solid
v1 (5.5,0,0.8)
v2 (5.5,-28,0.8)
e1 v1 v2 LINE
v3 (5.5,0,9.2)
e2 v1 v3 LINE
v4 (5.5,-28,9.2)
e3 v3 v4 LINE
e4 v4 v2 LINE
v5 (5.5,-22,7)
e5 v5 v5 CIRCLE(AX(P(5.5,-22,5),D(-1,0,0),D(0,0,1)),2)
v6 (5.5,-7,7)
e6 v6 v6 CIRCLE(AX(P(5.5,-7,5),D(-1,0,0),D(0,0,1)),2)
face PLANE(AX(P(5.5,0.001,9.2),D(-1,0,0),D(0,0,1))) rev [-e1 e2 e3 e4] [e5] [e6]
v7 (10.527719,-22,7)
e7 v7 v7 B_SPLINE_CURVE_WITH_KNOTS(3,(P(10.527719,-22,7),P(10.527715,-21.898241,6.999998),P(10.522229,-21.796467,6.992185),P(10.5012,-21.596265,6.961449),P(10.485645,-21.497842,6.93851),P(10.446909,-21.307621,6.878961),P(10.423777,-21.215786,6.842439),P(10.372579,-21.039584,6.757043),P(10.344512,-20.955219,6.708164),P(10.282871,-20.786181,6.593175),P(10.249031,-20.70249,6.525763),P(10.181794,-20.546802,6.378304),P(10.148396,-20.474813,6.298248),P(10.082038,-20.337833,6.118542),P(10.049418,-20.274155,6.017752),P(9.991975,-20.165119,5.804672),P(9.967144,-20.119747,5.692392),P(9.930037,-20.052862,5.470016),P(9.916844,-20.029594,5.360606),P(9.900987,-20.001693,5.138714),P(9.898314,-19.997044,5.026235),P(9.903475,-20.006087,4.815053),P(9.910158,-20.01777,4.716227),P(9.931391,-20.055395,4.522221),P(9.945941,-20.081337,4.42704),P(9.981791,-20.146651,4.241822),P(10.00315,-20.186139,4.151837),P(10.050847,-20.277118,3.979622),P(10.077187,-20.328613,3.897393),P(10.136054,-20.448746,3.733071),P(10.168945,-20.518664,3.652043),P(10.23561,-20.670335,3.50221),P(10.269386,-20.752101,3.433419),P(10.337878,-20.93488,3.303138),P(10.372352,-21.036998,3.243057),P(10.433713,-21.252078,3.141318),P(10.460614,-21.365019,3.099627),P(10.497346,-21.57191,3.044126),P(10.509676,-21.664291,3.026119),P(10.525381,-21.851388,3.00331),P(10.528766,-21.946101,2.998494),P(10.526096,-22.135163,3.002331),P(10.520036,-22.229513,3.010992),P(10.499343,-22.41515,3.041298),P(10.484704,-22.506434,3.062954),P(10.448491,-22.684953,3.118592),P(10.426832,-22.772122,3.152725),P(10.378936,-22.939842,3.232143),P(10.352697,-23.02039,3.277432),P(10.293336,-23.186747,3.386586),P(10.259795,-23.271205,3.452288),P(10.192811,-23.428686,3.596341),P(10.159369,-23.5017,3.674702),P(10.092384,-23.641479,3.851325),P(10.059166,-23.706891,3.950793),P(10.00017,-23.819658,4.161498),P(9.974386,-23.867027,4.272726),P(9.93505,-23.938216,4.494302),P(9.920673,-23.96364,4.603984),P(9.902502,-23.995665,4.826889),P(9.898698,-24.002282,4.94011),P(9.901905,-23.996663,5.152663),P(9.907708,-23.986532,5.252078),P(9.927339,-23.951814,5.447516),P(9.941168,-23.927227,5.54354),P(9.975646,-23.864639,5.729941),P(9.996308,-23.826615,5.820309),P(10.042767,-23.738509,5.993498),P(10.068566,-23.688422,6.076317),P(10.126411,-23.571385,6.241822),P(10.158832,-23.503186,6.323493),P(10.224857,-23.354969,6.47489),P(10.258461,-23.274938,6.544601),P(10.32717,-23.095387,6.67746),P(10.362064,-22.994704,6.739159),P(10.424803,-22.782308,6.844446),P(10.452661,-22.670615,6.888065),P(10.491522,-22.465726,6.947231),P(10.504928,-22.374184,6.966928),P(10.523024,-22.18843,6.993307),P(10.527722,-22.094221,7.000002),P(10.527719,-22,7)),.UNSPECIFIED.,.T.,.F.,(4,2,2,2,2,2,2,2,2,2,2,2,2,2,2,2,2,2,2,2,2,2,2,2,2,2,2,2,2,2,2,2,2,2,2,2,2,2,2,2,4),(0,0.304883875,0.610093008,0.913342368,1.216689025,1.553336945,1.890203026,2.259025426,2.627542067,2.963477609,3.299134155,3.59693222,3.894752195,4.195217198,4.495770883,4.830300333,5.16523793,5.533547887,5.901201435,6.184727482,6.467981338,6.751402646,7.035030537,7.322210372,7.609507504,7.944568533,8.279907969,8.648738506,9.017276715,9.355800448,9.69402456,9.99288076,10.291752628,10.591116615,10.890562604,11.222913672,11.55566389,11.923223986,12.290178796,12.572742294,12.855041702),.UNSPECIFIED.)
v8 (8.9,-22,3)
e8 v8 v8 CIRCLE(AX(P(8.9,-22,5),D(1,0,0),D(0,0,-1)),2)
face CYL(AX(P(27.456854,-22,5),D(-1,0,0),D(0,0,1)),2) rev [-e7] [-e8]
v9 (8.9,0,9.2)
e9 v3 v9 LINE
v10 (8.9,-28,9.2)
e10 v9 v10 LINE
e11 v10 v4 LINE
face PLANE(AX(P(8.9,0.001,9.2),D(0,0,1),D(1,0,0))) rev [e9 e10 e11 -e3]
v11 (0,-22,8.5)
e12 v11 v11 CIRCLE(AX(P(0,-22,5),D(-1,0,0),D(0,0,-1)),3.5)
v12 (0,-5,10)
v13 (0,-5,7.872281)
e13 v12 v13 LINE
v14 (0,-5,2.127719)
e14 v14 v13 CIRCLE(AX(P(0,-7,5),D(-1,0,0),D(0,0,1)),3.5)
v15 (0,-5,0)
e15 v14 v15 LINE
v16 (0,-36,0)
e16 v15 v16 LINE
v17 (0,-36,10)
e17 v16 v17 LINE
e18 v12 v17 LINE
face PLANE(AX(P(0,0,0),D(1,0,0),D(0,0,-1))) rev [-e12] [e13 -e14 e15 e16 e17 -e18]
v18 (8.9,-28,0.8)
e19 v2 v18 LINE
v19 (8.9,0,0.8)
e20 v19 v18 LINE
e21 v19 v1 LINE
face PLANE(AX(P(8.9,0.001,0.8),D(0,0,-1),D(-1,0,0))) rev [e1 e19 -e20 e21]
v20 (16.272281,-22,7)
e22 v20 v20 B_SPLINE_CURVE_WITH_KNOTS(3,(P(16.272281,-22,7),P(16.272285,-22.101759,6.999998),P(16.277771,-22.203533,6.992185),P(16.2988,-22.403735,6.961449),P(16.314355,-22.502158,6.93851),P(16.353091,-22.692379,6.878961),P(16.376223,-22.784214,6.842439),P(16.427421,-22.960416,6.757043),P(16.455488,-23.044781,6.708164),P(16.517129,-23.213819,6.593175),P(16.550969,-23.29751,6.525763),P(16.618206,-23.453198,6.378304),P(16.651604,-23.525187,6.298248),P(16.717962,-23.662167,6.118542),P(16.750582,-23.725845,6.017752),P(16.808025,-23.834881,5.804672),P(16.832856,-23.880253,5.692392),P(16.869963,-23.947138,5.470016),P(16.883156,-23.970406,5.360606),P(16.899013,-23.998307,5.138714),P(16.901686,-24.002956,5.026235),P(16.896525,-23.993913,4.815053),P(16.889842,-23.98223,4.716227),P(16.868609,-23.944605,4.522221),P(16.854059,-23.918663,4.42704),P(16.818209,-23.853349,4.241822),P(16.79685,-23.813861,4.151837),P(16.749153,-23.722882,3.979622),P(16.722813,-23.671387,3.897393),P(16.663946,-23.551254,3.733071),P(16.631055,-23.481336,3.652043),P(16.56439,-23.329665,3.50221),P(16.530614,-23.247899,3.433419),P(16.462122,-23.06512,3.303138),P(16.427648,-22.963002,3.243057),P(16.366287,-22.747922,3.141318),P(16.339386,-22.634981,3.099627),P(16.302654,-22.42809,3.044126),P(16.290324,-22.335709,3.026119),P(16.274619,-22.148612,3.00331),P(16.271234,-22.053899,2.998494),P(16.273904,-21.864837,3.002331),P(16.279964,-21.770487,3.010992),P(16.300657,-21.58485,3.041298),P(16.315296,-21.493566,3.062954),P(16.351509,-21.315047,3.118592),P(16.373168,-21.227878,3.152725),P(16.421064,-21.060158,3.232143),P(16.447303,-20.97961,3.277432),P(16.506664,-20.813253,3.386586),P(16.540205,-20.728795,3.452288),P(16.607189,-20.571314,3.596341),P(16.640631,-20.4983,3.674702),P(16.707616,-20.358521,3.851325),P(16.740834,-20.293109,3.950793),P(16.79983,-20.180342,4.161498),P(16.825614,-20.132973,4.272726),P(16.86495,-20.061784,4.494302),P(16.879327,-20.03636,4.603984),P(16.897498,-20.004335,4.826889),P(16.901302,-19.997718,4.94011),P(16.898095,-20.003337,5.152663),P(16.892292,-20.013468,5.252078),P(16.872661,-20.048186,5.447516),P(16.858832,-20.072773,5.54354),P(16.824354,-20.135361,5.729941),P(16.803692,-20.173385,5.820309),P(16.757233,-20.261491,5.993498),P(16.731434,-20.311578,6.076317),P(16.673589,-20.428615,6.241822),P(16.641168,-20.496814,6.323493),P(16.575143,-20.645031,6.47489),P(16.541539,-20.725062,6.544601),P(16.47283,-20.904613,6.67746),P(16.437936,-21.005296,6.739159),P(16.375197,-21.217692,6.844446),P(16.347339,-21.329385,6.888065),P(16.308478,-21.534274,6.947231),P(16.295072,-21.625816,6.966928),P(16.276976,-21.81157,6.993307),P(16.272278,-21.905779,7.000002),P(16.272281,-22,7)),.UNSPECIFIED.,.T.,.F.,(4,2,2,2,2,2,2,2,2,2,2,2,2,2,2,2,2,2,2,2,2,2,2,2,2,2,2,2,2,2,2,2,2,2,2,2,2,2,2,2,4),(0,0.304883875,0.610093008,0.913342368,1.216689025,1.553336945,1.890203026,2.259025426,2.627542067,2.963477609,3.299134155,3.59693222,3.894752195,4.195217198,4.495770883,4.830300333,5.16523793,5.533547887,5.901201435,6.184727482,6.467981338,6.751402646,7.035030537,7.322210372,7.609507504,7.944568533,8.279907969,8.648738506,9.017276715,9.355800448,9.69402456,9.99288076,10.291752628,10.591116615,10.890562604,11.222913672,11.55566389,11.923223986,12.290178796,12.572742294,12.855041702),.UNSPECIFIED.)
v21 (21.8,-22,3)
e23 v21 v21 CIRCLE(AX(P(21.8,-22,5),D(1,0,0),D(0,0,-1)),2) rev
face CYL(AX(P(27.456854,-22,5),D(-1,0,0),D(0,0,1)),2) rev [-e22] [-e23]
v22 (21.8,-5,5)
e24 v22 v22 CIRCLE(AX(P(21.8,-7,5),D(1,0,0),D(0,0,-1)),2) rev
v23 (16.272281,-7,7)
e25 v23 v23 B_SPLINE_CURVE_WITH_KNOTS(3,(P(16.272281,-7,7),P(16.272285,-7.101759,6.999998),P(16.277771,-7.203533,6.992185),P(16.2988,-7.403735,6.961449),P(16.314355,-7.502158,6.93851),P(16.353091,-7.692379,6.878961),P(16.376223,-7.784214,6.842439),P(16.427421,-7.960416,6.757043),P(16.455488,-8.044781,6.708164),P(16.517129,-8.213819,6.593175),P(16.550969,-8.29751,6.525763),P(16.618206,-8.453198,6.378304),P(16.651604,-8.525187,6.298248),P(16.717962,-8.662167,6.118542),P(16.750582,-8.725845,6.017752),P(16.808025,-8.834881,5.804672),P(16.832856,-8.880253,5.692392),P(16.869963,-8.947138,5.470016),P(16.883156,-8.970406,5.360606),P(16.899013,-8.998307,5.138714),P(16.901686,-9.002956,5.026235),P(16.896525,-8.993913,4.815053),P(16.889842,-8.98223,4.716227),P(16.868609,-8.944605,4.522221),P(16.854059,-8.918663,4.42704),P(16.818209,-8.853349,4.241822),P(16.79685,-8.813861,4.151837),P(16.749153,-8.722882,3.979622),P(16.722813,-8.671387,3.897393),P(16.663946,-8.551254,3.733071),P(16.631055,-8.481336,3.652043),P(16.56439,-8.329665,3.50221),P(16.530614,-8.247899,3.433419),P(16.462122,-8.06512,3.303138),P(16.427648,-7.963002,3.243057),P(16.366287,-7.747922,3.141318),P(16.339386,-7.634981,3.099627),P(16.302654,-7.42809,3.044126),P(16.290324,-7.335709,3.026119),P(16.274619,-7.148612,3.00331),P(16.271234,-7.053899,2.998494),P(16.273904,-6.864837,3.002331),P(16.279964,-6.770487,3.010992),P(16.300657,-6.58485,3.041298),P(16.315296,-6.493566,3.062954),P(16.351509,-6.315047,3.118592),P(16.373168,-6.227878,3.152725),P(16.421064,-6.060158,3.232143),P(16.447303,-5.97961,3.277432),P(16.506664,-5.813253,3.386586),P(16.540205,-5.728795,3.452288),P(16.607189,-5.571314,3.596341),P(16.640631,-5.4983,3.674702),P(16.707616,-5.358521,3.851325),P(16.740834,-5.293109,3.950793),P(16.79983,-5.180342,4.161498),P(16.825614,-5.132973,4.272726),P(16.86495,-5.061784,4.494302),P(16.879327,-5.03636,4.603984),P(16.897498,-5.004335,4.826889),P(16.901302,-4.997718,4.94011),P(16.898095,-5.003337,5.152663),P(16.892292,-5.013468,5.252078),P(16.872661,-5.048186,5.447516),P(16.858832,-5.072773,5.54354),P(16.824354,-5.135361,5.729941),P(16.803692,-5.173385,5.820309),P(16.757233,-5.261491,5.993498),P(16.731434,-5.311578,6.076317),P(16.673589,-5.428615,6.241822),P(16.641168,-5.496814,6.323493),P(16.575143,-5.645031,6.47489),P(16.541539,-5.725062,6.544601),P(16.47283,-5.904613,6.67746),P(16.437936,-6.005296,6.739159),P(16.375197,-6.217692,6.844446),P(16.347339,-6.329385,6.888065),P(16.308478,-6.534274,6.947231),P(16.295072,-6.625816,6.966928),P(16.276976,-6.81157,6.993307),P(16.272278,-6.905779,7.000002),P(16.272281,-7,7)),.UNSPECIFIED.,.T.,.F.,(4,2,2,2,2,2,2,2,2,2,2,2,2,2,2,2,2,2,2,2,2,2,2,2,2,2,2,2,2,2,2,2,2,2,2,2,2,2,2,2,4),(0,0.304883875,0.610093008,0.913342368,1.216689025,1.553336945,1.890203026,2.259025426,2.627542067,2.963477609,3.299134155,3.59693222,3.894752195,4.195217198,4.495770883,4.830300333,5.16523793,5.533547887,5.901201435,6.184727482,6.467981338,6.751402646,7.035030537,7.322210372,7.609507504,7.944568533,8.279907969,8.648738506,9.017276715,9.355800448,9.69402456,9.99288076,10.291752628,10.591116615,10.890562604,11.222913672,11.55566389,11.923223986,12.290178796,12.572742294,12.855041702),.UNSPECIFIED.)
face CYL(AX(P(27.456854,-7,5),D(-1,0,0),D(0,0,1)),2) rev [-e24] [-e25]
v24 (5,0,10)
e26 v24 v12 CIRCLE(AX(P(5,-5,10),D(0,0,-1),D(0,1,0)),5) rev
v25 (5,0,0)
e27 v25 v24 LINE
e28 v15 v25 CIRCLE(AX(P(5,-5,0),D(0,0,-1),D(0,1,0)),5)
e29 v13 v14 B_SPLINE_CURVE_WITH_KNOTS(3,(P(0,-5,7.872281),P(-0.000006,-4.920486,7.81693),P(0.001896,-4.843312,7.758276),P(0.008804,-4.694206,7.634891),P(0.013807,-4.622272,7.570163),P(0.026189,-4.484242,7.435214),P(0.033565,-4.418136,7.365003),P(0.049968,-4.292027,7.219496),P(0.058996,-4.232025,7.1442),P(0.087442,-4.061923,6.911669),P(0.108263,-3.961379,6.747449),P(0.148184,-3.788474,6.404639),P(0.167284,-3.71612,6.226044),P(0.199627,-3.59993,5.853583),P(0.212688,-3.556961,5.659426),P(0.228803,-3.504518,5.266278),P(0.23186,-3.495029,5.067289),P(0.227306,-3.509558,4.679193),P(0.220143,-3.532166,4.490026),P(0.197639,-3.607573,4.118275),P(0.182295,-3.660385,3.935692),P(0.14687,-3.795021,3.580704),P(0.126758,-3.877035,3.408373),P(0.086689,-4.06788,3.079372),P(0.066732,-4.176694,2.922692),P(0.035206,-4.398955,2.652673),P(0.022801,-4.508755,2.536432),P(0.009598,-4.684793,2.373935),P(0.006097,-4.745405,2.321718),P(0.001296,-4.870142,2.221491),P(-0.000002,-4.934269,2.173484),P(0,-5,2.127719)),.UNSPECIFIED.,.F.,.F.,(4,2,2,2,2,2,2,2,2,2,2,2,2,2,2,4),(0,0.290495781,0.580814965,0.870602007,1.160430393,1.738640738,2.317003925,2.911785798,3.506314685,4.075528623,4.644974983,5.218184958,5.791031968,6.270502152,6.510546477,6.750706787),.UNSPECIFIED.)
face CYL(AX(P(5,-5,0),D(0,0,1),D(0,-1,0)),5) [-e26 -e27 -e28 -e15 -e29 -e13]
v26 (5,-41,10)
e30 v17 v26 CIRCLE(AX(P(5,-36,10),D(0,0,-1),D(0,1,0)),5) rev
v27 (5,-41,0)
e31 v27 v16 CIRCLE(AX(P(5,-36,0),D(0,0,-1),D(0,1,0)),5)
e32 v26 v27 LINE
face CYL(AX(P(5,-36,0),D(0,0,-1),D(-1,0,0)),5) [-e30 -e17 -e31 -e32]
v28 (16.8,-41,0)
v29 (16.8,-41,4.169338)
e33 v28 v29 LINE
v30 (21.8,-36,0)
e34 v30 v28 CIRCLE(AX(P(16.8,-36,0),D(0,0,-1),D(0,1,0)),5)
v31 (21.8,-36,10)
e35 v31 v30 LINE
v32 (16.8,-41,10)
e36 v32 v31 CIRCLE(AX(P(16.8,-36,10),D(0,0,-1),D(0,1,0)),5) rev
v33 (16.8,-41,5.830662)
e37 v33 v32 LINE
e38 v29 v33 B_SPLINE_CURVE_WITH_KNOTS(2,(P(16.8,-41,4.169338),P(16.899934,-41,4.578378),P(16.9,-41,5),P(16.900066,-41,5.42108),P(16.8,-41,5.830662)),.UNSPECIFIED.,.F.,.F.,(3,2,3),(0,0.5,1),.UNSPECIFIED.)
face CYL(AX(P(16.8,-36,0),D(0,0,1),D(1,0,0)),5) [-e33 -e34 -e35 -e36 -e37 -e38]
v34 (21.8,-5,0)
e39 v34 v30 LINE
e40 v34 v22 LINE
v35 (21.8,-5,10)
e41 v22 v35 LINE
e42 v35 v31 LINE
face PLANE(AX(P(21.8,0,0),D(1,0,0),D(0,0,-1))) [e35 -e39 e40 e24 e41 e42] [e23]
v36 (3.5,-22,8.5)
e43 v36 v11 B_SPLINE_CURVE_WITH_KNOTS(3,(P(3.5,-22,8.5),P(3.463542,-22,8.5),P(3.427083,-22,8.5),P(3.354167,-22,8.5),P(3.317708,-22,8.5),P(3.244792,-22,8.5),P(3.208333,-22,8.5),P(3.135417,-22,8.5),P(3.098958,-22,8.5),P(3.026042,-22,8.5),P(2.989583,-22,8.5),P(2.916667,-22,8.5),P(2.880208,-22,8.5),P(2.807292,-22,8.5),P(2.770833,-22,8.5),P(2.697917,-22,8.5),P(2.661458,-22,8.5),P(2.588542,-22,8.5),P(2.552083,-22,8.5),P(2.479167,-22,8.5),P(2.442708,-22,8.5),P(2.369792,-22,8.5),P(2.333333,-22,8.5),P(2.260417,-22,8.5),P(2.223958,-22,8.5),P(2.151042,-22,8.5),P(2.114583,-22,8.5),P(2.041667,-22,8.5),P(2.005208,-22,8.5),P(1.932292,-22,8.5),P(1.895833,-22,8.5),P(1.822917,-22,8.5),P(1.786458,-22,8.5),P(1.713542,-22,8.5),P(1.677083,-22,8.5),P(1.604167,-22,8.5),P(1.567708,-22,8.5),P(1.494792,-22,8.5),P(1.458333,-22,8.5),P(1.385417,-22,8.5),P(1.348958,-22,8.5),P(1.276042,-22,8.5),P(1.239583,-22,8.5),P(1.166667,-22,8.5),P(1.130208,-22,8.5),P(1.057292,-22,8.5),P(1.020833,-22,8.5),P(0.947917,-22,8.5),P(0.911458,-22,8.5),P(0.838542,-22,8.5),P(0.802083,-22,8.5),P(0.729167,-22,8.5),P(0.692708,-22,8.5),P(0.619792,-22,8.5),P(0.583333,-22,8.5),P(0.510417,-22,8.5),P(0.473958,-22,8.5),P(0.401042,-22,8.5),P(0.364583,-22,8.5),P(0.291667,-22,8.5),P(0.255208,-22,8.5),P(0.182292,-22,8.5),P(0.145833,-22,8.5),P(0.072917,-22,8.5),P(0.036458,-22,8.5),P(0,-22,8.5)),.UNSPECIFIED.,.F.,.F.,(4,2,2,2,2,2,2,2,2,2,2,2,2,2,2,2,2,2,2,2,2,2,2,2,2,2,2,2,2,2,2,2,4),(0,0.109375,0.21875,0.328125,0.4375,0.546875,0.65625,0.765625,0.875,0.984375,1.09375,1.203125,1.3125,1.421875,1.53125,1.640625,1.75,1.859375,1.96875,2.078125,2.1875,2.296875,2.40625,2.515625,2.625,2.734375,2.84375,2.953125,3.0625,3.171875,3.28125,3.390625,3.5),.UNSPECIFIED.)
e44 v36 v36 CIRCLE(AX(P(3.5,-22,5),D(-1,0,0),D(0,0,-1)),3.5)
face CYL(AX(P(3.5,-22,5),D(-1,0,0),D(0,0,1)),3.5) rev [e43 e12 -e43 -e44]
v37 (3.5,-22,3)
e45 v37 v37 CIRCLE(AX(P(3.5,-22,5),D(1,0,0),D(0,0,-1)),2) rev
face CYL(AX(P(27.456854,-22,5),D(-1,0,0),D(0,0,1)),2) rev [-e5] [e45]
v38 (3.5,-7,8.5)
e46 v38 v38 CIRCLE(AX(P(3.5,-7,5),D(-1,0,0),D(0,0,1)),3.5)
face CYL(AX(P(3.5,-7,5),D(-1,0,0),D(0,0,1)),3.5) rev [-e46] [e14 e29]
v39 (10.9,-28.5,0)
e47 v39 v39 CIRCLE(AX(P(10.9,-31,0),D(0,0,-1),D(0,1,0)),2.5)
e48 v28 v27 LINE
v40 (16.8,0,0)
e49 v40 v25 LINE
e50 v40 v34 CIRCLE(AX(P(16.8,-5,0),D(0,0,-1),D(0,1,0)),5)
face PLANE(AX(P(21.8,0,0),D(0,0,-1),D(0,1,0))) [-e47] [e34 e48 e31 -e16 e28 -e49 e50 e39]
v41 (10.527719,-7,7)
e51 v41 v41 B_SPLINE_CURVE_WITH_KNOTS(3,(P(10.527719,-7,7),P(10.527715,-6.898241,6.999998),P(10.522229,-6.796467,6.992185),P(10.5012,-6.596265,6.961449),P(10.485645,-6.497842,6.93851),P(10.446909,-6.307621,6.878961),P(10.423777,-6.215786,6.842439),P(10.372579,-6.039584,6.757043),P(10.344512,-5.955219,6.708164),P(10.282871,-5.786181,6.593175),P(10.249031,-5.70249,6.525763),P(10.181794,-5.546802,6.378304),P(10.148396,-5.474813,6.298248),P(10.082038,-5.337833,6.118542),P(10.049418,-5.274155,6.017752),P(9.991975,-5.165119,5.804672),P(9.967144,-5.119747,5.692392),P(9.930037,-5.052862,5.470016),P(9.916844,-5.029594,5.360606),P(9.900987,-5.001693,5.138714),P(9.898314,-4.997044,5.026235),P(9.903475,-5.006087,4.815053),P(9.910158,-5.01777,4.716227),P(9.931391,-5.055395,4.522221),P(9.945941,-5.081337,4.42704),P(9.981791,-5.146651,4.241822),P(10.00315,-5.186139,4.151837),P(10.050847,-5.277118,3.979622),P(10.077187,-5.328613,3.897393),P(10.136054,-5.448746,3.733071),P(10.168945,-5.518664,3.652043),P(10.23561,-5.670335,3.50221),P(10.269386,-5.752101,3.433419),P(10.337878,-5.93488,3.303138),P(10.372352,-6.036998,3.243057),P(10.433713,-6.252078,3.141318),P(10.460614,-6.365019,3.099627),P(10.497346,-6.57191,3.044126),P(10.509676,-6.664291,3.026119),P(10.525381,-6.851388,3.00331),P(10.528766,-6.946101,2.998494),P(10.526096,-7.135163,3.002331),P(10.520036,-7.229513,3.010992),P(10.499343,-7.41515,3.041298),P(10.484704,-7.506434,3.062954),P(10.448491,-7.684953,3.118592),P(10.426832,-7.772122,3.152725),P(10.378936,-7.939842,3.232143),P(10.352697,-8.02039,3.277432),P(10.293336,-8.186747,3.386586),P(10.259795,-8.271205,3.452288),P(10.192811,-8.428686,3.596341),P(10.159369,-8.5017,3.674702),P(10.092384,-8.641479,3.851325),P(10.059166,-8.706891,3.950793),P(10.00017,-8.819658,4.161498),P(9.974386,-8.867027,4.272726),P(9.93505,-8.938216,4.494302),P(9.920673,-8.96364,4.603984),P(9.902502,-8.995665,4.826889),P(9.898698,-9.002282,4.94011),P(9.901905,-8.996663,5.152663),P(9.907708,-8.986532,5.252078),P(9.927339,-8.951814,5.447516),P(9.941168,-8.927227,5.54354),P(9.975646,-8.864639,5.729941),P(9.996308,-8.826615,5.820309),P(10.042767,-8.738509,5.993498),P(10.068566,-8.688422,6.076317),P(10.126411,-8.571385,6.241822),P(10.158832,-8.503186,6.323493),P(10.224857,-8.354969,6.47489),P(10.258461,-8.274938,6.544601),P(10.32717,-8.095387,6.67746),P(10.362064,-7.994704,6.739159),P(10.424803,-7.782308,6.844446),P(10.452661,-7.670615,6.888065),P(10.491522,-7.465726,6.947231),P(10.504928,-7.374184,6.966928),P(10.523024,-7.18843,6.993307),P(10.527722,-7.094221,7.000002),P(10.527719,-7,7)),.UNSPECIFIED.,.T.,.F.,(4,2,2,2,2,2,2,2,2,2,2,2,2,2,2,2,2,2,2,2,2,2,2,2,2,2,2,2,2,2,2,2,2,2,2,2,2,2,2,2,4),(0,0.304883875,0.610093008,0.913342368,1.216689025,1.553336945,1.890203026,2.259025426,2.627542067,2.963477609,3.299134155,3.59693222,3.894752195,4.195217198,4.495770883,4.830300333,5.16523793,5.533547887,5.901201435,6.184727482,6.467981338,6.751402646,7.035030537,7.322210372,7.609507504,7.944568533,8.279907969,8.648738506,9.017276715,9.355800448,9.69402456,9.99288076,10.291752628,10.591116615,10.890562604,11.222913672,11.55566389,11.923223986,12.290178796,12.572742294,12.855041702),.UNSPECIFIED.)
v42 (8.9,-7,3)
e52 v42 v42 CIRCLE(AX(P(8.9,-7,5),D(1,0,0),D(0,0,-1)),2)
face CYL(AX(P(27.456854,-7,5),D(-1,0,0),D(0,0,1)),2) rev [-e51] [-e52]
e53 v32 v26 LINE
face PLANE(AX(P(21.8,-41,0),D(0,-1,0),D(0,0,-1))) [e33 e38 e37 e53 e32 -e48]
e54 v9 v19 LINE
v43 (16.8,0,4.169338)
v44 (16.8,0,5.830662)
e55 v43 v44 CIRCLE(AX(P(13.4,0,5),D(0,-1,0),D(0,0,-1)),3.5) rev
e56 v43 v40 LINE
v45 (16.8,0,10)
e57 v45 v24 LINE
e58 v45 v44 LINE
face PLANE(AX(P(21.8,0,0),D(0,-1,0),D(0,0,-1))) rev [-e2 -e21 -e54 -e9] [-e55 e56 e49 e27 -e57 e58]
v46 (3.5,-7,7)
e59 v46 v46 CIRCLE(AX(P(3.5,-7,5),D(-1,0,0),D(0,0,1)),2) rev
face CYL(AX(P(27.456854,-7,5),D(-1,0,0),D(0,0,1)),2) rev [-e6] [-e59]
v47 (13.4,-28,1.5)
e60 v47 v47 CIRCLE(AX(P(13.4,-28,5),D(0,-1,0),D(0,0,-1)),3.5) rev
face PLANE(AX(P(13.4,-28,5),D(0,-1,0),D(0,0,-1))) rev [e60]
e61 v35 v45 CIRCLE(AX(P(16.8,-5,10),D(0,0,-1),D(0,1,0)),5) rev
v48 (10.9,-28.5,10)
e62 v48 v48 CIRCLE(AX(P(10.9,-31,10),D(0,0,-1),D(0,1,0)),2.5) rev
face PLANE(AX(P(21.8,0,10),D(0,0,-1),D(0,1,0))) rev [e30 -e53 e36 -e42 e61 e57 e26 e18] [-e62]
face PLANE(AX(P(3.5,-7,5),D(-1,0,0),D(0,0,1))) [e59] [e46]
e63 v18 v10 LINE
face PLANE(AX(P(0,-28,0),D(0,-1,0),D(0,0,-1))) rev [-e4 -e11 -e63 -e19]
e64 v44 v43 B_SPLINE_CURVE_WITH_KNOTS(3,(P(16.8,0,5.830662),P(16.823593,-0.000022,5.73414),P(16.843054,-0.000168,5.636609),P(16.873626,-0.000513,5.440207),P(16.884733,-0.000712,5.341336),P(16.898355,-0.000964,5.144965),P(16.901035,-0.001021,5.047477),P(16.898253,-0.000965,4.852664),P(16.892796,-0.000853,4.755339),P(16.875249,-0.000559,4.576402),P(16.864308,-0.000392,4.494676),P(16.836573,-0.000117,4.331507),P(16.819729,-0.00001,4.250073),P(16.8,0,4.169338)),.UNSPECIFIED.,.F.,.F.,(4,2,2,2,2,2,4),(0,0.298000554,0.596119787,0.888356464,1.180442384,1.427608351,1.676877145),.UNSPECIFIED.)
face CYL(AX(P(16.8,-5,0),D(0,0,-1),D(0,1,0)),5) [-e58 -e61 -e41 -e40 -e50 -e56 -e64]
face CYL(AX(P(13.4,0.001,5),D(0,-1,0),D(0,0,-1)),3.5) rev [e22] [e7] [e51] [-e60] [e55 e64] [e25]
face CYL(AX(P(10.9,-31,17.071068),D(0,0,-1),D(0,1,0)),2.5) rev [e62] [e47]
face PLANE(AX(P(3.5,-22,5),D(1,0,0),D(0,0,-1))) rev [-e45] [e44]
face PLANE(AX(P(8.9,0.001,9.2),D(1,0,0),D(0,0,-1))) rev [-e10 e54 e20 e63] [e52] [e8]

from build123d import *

# Parameters (mm, degrees)
CROQUIS1_W              = 10
CROQUIS1_H              = 41
SALIENTE_EXTRUIR1_DEPTH = 21.8
CROQUIS6_R              = 2
CORTAR_EXTRUIR2_DEPTH   = 21.8
CORTAR_EXTRUIR4_REACH   = 49.5
CROQUIS11_R             = 3.5
CROQUIS11_W             = 3.4
CROQUIS11_H             = 8.4
CORTAR_EXTRUIR5_REACH   = 49.5
CROQUIS12_R             = 2.5
REDONDEO1_R             = 5
CROQUIS13_R             = 3.5
CORTAR_EXTRUIR6_DEPTH   = 3.5
CROQUIS15_W             = 3.4
CROQUIS15_H             = 8.4
SALIENTE_EXTRUIR2_DEPTH = 13
CORTAR_EXTRUIR7_START   = -10
CROQUIS16_R             = 2.5
CORTAR_EXTRUIR7_DEPTH   = 10


with BuildPart() as part:
    # Croquis1 → Saliente-Extruir1 (new body)
    with BuildSketch(Plane(origin=(0, 0, 0), x_dir=(0, 0, -1), z_dir=(1, 0, 0))):
        with Locations((-5, -20.5)):
            Rectangle(CROQUIS1_W, CROQUIS1_H)
    extrude(amount=SALIENTE_EXTRUIR1_DEPTH)

    # Croquis6 → Cortar-Extruir2 (cut)
    with BuildSketch(Plane.ZY):
        with Locations((5, -22)):
            Circle(CROQUIS6_R)
        with Locations((5, -7)):
            Circle(CROQUIS6_R)
    extrude(amount=-CORTAR_EXTRUIR2_DEPTH, mode=Mode.SUBTRACT)

    # Croquis11 → Cortar-Extruir4 (cut, up to next)
    with BuildSketch(Plane.XZ.offset(41), mode=Mode.PRIVATE) as cortar_extruir4_sk1:
        with Locations(Location((13.4, 5, 0), (0, 0, 270))):
            Circle(CROQUIS11_R)
    cortar_extruir4_tool1 = extrude(cortar_extruir4_sk1.sketch, amount=-CORTAR_EXTRUIR4_REACH, mode=Mode.PRIVATE) & part.part
    # Croquis11 → Cortar-Extruir4 (cut, up to next)
    with BuildSketch(Plane.XZ.offset(41), mode=Mode.PRIVATE) as cortar_extruir4_sk2:
        with Locations((7.2, 5)):
            Rectangle(CROQUIS11_W, CROQUIS11_H)
    cortar_extruir4_tool2 = extrude(cortar_extruir4_sk2.sketch, amount=-CORTAR_EXTRUIR4_REACH, mode=Mode.PRIVATE) & part.part
    add(cortar_extruir4_tool1.solids().sort_by_distance((13.4, -41, 5))[0], mode=Mode.SUBTRACT)
    add(cortar_extruir4_tool2.solids().sort_by_distance((7.2, -41, 5))[0], mode=Mode.SUBTRACT)

    # Cortar-Extruir5: up to this face of the body (flat: up to its plane)
    cortar_extruir5_end = Plane(part.part.faces().sort_by_distance((10.9, -20.5, 10))[0])
    # Croquis12 → Cortar-Extruir5 (cut, up to the picked face)
    with BuildSketch(Plane(origin=(0, 0, 0), x_dir=(-1, 0, 0), z_dir=(0, 0, -1)), mode=Mode.PRIVATE) as cortar_extruir5_sk1:
        with Locations(Location((-10.9, -31, 0), (0, 0, 90))):
            Circle(CROQUIS12_R)
    cortar_extruir5_tool1 = split(extrude(cortar_extruir5_sk1.sketch, amount=-CORTAR_EXTRUIR5_REACH, mode=Mode.PRIVATE), bisect_by=cortar_extruir5_end, keep=Keep.BOTH, mode=Mode.PRIVATE)
    add(cortar_extruir5_tool1.solids().sort_by(Axis((10.9, -31, 0), (0, 0, 1)))[0], mode=Mode.SUBTRACT)

    # Redondeo1
    # the kernel refuses this fillet: 5 mm, written as the material it takes off along each edge
    with BuildSketch(Plane(origin=(21.8, -41, 22.5), x_dir=(0, 1, 0), z_dir=(0, 0, -1)), Plane(origin=(0, 0, -12.5), x_dir=(1, 0, 0), z_dir=(0, 0, 1))) as redondeo1_piece_1:
        with BuildLine():
            CenterArc((REDONDEO1_R, -REDONDEO1_R), REDONDEO1_R, 90, 90)
            Line((0, -REDONDEO1_R), (0, 0))
            Line((0, 0), (REDONDEO1_R, 0))
        make_face()
    extrude(amount=35, mode=Mode.SUBTRACT)
    with BuildSketch(Plane(origin=(21.8, 0, -12.5), x_dir=(-1, 0, 0), z_dir=(0, 0, 1)), Plane(origin=(0, -41, 22.5), x_dir=(0, 1, 0), z_dir=(0, 0, -1))) as redondeo1_piece_2:
        with BuildLine():
            CenterArc((REDONDEO1_R, REDONDEO1_R), REDONDEO1_R, 180, 90)
            Line((0, REDONDEO1_R), (0, 0))
            Line((0, 0), (REDONDEO1_R, 0))
        make_face()
    extrude(amount=35, mode=Mode.SUBTRACT)

    # Croquis13 → Cortar-Extruir6 (cut)
    with BuildSketch(Plane.ZY):
        with Locations((5, -7)):
            Circle(CROQUIS13_R)
        with Locations((5, -22)):
            Circle(CROQUIS13_R)
    extrude(amount=-CORTAR_EXTRUIR6_DEPTH, mode=Mode.SUBTRACT)

    # Croquis15 → Saliente-Extruir2 (add)
    with BuildSketch(Plane.XZ.offset(41)):
        with Locations((7.2, 5)):
            Rectangle(CROQUIS15_W, CROQUIS15_H)
        with BuildLine():
            ThreePointArc((16.8, 4.169337614), (16.9, 5), (16.8, 5.830662386))
            ThreePointArc((16.8, 5.830662386), (9.9, 5), (16.8, 4.169337614))
        make_face()
    extrude(amount=-SALIENTE_EXTRUIR2_DEPTH)

    # Croquis16 → Cortar-Extruir7 (cut)
    with BuildSketch(Plane.XY.offset(10).offset(CORTAR_EXTRUIR7_START)):
        with Locations(Location((10.9, -31, 0), (0, 0, 90))):
            Circle(CROQUIS16_R)
    extrude(amount=CORTAR_EXTRUIR7_DEPTH, mode=Mode.SUBTRACT)


solid = part.part
